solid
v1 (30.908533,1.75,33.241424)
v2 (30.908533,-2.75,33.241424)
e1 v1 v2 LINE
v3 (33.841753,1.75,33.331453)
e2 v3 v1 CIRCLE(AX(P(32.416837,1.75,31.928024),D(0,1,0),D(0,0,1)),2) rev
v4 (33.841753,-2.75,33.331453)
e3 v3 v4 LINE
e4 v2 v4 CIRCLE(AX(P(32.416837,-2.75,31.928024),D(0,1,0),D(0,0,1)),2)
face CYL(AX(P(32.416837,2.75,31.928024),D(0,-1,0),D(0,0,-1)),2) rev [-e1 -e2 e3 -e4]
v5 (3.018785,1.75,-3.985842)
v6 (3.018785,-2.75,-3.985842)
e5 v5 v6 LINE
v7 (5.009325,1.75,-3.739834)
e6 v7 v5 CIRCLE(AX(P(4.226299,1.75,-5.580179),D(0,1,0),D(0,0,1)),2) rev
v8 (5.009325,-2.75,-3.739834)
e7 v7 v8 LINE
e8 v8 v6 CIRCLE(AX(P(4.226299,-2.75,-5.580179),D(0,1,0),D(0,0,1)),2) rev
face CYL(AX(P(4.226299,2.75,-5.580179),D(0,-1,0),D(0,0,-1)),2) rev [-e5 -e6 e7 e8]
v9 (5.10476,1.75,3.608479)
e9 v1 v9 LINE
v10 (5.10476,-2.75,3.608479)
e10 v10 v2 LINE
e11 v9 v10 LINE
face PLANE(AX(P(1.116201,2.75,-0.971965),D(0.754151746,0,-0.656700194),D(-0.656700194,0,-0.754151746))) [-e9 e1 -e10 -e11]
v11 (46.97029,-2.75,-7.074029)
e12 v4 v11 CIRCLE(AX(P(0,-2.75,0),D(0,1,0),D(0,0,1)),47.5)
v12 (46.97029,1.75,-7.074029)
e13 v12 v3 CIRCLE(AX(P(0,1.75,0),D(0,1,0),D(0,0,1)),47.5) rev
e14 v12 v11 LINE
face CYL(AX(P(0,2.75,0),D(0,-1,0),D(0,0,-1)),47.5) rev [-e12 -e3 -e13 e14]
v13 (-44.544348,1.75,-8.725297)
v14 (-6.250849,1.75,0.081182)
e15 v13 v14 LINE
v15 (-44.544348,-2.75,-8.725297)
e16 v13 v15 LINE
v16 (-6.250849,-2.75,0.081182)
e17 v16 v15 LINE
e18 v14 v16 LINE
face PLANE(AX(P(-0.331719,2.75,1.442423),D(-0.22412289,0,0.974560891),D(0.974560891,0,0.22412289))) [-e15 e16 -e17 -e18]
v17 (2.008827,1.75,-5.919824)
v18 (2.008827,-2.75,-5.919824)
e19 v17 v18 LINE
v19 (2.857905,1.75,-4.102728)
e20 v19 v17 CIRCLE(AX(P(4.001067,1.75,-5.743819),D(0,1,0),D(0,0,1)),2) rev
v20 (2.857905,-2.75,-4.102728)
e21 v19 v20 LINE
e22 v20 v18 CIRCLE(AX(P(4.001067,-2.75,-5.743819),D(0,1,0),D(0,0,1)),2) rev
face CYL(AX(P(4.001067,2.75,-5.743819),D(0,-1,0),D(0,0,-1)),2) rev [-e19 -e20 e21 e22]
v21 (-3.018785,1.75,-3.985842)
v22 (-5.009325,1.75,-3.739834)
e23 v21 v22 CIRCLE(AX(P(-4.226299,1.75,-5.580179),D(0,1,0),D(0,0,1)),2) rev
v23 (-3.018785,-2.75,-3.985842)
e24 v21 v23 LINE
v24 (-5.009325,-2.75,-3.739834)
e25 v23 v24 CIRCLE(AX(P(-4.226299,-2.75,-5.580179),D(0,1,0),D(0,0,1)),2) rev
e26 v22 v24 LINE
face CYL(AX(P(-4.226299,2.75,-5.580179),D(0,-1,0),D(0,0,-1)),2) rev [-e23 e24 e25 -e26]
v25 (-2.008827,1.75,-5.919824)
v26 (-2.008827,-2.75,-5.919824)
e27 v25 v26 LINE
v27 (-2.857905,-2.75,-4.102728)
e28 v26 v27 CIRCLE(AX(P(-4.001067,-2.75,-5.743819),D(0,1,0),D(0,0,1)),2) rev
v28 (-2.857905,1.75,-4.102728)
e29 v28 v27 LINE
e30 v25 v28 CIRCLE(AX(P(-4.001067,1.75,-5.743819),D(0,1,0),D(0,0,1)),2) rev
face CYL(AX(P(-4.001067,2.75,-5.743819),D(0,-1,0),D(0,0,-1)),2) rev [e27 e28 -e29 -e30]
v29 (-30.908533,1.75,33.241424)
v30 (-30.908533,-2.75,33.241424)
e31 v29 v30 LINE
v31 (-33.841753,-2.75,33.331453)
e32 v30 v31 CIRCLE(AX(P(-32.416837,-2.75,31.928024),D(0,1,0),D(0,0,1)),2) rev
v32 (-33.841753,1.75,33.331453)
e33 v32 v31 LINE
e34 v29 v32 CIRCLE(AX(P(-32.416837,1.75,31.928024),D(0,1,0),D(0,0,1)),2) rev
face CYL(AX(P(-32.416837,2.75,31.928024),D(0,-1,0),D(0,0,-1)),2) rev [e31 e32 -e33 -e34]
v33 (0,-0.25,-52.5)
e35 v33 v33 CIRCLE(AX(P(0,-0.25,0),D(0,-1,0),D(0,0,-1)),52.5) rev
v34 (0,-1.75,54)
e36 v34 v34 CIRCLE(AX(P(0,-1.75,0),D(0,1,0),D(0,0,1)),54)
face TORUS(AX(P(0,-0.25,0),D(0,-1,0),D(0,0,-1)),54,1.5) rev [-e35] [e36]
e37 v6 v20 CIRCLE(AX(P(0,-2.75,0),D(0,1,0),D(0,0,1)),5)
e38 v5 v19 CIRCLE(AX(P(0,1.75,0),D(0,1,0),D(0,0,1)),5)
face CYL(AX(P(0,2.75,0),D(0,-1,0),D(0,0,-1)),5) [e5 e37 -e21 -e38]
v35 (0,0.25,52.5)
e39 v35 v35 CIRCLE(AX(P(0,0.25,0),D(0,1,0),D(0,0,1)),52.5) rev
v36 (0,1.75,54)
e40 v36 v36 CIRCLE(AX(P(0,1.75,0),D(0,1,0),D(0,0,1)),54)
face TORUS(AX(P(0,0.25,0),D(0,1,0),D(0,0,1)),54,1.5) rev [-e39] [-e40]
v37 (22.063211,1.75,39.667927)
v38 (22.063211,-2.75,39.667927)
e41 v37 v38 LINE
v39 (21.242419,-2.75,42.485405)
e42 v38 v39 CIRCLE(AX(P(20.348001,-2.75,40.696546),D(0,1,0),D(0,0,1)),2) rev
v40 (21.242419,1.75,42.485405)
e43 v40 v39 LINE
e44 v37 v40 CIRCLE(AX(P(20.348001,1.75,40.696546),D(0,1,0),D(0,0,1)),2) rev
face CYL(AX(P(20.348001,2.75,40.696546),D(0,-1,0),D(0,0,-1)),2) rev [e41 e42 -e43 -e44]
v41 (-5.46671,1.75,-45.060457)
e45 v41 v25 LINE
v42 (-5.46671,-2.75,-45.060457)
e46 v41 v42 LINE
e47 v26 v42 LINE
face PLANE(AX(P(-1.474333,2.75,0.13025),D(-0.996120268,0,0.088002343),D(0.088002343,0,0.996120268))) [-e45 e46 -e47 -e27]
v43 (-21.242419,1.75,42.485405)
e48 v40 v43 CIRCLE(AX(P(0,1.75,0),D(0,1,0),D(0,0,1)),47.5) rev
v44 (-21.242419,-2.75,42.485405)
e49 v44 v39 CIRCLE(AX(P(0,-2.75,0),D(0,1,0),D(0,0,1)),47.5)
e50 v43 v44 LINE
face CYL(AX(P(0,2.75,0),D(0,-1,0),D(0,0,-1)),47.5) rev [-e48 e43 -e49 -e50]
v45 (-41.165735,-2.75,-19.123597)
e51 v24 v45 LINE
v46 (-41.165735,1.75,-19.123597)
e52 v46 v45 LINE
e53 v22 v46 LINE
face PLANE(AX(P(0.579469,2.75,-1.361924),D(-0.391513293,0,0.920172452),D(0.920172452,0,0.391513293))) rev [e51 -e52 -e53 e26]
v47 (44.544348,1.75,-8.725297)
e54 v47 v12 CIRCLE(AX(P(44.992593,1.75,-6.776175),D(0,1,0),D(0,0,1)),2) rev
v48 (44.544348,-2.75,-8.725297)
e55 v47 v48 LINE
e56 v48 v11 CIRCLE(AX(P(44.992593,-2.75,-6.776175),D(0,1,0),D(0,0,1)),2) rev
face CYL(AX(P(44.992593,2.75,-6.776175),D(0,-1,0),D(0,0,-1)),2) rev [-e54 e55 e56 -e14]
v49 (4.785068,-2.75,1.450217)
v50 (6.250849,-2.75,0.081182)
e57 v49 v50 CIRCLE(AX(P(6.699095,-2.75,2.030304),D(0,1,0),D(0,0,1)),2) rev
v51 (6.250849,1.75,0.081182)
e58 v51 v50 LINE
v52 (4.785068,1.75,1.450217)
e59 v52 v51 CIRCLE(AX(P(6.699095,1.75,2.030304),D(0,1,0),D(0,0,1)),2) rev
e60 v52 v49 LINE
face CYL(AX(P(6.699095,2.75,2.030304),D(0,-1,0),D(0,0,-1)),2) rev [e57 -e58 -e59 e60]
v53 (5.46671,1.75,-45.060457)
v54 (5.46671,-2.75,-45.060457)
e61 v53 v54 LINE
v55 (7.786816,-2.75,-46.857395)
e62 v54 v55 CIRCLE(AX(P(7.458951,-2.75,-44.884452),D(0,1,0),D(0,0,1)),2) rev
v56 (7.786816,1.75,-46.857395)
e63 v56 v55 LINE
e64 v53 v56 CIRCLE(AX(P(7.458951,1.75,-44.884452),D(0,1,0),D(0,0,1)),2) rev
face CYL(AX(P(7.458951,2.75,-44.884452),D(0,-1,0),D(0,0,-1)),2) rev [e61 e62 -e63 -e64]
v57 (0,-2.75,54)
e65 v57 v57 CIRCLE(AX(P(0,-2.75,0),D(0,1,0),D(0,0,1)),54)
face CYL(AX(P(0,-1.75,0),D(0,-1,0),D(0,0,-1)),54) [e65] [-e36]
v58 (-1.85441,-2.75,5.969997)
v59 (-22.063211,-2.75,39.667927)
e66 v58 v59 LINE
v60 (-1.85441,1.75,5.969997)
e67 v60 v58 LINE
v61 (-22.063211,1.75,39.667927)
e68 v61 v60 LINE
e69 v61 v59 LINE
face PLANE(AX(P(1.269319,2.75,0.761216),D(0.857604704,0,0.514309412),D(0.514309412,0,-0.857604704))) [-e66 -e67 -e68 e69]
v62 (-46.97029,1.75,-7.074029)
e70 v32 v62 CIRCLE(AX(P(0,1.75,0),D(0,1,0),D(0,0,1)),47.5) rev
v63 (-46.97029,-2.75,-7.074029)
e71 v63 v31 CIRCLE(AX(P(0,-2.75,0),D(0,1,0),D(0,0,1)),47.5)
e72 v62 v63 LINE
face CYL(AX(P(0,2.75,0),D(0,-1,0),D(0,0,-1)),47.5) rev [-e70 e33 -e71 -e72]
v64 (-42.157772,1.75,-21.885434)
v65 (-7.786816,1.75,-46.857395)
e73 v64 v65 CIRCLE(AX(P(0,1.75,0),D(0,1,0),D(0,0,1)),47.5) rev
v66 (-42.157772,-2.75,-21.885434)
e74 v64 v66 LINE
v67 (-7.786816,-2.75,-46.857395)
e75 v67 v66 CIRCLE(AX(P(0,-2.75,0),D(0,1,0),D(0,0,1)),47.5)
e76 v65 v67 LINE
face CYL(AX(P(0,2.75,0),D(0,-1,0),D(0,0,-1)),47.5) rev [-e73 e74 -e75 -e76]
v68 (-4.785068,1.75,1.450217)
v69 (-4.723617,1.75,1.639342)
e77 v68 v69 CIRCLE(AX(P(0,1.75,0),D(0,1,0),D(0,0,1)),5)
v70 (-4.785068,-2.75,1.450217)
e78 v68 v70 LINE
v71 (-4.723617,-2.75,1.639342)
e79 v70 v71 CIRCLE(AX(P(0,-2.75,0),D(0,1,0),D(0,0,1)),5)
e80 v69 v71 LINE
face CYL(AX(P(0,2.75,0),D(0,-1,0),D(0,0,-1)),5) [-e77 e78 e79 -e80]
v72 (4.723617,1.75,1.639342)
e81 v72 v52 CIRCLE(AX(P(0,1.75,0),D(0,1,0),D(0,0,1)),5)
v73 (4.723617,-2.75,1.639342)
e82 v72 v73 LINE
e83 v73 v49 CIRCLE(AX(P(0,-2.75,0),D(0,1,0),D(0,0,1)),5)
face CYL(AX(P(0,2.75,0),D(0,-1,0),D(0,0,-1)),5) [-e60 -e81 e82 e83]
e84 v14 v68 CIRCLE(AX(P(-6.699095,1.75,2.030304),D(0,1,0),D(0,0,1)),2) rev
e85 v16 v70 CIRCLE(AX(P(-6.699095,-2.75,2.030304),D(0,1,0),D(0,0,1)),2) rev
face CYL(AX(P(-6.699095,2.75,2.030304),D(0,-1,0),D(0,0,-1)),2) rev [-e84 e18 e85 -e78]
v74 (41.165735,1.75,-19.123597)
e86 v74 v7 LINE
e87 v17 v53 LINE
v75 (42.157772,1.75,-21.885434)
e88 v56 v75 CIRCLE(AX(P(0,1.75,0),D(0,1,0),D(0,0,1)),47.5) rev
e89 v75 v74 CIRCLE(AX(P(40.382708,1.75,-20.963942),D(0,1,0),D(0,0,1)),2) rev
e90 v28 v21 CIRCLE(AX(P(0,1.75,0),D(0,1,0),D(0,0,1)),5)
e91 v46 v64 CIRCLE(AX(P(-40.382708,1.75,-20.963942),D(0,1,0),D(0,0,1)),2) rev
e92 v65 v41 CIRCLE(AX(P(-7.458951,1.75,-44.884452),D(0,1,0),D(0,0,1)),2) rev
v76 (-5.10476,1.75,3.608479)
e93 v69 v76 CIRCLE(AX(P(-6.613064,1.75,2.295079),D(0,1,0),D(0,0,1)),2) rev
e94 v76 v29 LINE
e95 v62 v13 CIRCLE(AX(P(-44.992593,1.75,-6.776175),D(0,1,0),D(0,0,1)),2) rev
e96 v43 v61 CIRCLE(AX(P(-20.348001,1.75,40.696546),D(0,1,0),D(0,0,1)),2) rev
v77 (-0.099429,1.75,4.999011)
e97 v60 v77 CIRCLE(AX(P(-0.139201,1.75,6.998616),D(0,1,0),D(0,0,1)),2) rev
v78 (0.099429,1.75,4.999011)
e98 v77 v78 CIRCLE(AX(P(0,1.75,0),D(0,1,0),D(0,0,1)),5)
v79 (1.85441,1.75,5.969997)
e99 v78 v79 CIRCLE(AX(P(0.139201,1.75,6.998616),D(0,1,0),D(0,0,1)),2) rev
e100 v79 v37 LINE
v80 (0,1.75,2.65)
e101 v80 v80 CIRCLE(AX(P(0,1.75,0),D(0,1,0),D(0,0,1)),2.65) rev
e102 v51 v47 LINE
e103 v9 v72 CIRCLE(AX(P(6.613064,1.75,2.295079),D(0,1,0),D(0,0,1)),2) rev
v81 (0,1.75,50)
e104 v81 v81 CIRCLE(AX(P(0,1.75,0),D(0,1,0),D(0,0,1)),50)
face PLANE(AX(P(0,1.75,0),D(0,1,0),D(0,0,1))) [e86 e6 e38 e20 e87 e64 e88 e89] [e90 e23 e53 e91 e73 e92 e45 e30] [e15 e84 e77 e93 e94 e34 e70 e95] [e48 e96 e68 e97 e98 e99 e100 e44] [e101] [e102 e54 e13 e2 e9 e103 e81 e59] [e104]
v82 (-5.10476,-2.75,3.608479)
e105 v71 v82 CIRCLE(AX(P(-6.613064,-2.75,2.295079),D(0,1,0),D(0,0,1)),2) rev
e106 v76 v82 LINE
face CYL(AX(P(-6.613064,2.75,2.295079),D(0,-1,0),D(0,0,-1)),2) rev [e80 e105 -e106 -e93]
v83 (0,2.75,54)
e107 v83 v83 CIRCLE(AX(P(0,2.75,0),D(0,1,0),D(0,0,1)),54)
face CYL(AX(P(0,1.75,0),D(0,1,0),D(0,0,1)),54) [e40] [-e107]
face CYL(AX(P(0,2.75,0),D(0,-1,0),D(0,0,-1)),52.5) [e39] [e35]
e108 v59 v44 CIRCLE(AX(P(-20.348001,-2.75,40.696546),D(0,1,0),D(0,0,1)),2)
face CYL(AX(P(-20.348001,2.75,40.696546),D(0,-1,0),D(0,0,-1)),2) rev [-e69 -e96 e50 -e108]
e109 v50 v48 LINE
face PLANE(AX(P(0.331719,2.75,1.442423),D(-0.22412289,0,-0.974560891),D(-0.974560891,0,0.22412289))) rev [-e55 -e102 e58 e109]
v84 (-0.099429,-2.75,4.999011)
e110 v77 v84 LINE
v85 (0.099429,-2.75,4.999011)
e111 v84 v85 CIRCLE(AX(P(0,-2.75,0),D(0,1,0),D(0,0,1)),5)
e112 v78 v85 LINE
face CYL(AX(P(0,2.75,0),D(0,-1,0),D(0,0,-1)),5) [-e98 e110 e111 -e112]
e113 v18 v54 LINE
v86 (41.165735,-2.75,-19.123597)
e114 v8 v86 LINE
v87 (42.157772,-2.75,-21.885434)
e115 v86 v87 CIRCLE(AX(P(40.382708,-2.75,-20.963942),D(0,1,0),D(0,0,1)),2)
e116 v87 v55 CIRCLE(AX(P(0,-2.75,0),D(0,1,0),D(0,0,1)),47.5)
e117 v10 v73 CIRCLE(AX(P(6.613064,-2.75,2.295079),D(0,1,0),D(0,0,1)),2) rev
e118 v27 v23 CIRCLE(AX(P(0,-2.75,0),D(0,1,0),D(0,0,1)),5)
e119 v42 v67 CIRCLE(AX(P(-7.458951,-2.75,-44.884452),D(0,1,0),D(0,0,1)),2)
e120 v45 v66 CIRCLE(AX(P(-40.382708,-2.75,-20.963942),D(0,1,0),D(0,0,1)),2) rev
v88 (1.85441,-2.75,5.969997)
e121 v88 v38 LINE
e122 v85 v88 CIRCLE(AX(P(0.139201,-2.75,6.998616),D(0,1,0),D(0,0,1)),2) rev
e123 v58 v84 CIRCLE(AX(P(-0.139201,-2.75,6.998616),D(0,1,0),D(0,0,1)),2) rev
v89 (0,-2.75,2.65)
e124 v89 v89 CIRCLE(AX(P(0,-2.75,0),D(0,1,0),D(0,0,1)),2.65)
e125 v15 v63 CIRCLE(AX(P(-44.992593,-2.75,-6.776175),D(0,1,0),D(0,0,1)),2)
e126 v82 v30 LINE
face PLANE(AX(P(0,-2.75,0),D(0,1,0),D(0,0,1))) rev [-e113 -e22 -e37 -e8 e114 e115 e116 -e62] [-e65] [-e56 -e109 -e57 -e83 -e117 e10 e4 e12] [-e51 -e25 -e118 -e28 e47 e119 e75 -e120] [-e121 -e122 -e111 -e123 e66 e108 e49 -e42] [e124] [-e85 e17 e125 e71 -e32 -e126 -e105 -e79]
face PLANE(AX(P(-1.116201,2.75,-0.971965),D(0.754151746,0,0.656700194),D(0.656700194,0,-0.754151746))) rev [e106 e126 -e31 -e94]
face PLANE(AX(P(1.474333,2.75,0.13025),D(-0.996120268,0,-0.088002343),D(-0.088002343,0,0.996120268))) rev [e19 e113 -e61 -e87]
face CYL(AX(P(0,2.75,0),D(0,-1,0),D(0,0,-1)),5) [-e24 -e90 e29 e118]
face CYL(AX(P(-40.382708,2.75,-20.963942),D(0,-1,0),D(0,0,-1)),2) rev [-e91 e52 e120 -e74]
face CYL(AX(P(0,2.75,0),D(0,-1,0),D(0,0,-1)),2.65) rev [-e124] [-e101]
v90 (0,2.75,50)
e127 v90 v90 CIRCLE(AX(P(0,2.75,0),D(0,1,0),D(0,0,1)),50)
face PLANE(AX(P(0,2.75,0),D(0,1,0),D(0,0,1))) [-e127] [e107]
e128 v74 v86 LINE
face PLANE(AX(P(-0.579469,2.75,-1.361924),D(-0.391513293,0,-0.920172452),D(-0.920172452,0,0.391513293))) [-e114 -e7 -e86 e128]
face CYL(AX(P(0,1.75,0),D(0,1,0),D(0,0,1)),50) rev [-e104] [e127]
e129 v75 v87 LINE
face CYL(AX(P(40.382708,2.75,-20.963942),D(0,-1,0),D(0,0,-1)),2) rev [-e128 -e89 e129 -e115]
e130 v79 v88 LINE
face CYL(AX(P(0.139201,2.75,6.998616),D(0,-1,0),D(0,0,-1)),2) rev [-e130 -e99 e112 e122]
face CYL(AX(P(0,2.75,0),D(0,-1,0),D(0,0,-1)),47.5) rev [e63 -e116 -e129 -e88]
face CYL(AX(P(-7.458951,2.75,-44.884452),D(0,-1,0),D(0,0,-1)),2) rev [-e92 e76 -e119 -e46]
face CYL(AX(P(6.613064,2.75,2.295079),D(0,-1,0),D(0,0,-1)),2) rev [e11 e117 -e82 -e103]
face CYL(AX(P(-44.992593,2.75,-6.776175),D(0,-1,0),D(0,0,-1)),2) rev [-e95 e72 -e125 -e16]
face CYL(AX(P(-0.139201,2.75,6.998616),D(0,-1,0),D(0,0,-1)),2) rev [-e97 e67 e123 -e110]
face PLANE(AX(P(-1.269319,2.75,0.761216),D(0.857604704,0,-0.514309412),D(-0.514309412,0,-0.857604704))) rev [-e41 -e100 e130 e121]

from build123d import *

# Parameters (mm, degrees)
SKETCH_2_R          = 52.5
SKETCH_2_R_2        = 2.65
EXTRUDE_1_DEPTH     = 2.75
SKETCH_3_R          = 54
SKETCH_3_R_2        = 52.5
EXTRUDE_2_DEPTH     = 1
SKETCH_4_R          = 50
SKETCH_4_R_2        = 2.65
CUT_EXTRUDE_1_DEPTH = 1
FILLET_1_R          = 1.5


with BuildPart() as part:
    # 草图2 → 凸台-拉伸1 (new, symmetric)
    with BuildSketch(Plane(origin=(0, 0, 0), x_dir=(1, 0, 0), z_dir=(0, 1, 0))):
        with Locations(Location((0, 0, 0), (0, 0, 270))):
            Circle(SKETCH_2_R)
        with Locations(Location((0, 0, 0), (0, 0, 270))):
            Circle(SKETCH_2_R_2, mode=Mode.SUBTRACT)
        with BuildLine():
            Line((-5.104760308, -3.608479293), (-30.908533356, -33.241423952))
            ThreePointArc((-30.908533356, -33.241423952), (-32.355479798, -33.927082172), (-33.841752753, -33.331453173))
            ThreePointArc((-33.841752753, -33.331453173), (-45.175184524, -14.678307233), (-46.970289709, 7.074028884))
            ThreePointArc((-46.970289709, 7.074028884), (-46.117971572, 8.42951219), (-44.544347521, 8.725296818))
            Line((-44.544347521, 8.725296818), (-6.250848753, -0.081181754))
            ThreePointArc((-6.250848753, -0.081181754), (-5.333939805, -0.568676849), (-4.785067523, -1.450216811))
            ThreePointArc((-4.785067523, -1.450216811), (-4.755282581, -1.545084972), (-4.723617, -1.639342075))
            ThreePointArc((-4.723617, -1.639342075), (-4.649507815, -2.675141919), (-5.104760308, -3.608479293))
        make_face(mode=Mode.SUBTRACT)
        with BuildLine():
            Line((-5.009325433, 3.73983413), (-41.165734939, 19.123597139))
            ThreePointArc((-41.165734939, 19.123597139), (-42.264965697, 20.287844939), (-42.157772458, 21.885434001))
            ThreePointArc((-42.157772458, 21.885434001), (-27.919799484, 38.428307233), (-7.786816484, 46.857395244))
            ThreePointArc((-7.786816484, 46.857395244), (-6.234294464, 46.465659903), (-5.466709992, 45.060456971))
            Line((-5.466709992, 45.060456971), (-2.00882693, 5.919823897))
            ThreePointArc((-2.00882693, 5.919823897), (-2.18912187, 4.897147398), (-2.857905332, 4.102728009))
            ThreePointArc((-2.857905332, 4.102728009), (-2.938926261, 4.045084972), (-3.018784891, 3.985842167))
            ThreePointArc((-3.018784891, 3.985842167), (-3.980988084, 3.595280389), (-5.009325433, 3.73983413))
        make_face(mode=Mode.SUBTRACT)
        with BuildLine():
            Line((1.854410058, -5.96999698), (22.063210783, -39.667926976))
            ThreePointArc((22.063210783, -39.667926976), (22.26817946, -41.255934861), (21.242419017, -42.485404956))
            ThreePointArc((21.242419017, -42.485404956), (0, -47.5), (-21.242419017, -42.485404956))
            ThreePointArc((-21.242419017, -42.485404956), (-22.26817946, -41.255934861), (-22.063210783, -39.667926976))
            Line((-22.063210783, -39.667926976), (-1.854410058, -5.96999698))
            ThreePointArc((-1.854410058, -5.96999698), (-1.107434224, -5.24860902), (-0.099429036, -4.999011289))
            ThreePointArc((-0.099429036, -4.999011289), (0, -5), (0.099429036, -4.999011289))
            ThreePointArc((0.099429036, -4.999011289), (1.107434224, -5.24860902), (1.854410058, -5.96999698))
        make_face(mode=Mode.SUBTRACT)
        with BuildLine():
            Line((6.250848753, -0.081181754), (44.544347521, 8.725296818))
            ThreePointArc((44.544347521, 8.725296818), (46.117971572, 8.42951219), (46.970289709, 7.074028884))
            ThreePointArc((46.970289709, 7.074028884), (45.175184524, -14.678307233), (33.841752753, -33.331453173))
            ThreePointArc((33.841752753, -33.331453173), (32.355479798, -33.927082172), (30.908533356, -33.241423952))
            Line((30.908533356, -33.241423952), (5.104760308, -3.608479293))
            ThreePointArc((5.104760308, -3.608479293), (4.649507815, -2.675141919), (4.723617, -1.639342075))
            ThreePointArc((4.723617, -1.639342075), (4.755282581, -1.545084972), (4.785067523, -1.450216811))
            ThreePointArc((4.785067523, -1.450216811), (5.333939805, -0.568676849), (6.250848753, -0.081181754))
        make_face(mode=Mode.SUBTRACT)
        with BuildLine():
            Line((2.00882693, 5.919823897), (5.466709992, 45.060456971))
            ThreePointArc((5.466709992, 45.060456971), (6.234294464, 46.465659903), (7.786816484, 46.857395244))
            ThreePointArc((7.786816484, 46.857395244), (27.919799484, 38.428307233), (42.157772458, 21.885434001))
            ThreePointArc((42.157772458, 21.885434001), (42.264965697, 20.287844939), (41.165734939, 19.123597139))
            Line((41.165734939, 19.123597139), (5.009325433, 3.73983413))
            ThreePointArc((5.009325433, 3.73983413), (3.980988084, 3.595280389), (3.018784891, 3.985842167))
            ThreePointArc((3.018784891, 3.985842167), (2.938926261, 4.045084972), (2.857905332, 4.102728009))
            ThreePointArc((2.857905332, 4.102728009), (2.18912187, 4.897147398), (2.00882693, 5.919823897))
        make_face(mode=Mode.SUBTRACT)
    extrude(amount=EXTRUDE_1_DEPTH, both=True)

    # 草图3 → 凸台-拉伸2 (add)
    with BuildSketch(Plane(origin=(0, 2.75, 0), x_dir=(1, 0, 0), z_dir=(0, 1, 0))):
        with Locations(Location((0, 0, 0), (0, 0, 270))):
            Circle(SKETCH_3_R)
        with Locations(Location((0, 0, 0), (0, 0, 270))):
            Circle(SKETCH_3_R_2, mode=Mode.SUBTRACT)
    extrude_2 = extrude(amount=-EXTRUDE_2_DEPTH)

    # 草图4 → 切除-拉伸1 (cut)
    with BuildSketch(Plane(origin=(0, 2.75, 0), x_dir=(1, 0, 0), z_dir=(0, 1, 0))):
        with Locations(Location((0, 0, 0), (0, 0, 270))):
            Circle(SKETCH_4_R)
        with Locations(Location((0, 0, 0), (0, 0, 270))):
            Circle(SKETCH_4_R_2, mode=Mode.SUBTRACT)
        with BuildLine():
            Line((41.165734939, 19.123597139), (5.009325433, 3.73983413))
            ThreePointArc((5.009325433, 3.73983413), (3.980988084, 3.595280389), (3.018784891, 3.985842167))
            ThreePointArc((3.018784891, 3.985842167), (2.938926261, 4.045084972), (2.857905332, 4.102728009))
            ThreePointArc((2.857905332, 4.102728009), (2.18912187, 4.897147398), (2.00882693, 5.919823897))
            Line((2.00882693, 5.919823897), (5.466709992, 45.060456971))
            ThreePointArc((5.466709992, 45.060456971), (6.234294464, 46.465659903), (7.786816484, 46.857395244))
            ThreePointArc((7.786816484, 46.857395244), (27.919799484, 38.428307233), (42.157772458, 21.885434001))
            ThreePointArc((42.157772458, 21.885434001), (42.264965697, 20.287844939), (41.165734939, 19.123597139))
        make_face(mode=Mode.SUBTRACT)
        with BuildLine():
            Line((30.908533356, -33.241423952), (5.104760308, -3.608479293))
            ThreePointArc((5.104760308, -3.608479293), (4.649507815, -2.675141919), (4.723617, -1.639342075))
            ThreePointArc((4.723617, -1.639342075), (4.755282581, -1.545084972), (4.785067523, -1.450216811))
            ThreePointArc((4.785067523, -1.450216811), (5.333939805, -0.568676849), (6.250848753, -0.081181754))
            Line((6.250848753, -0.081181754), (44.544347521, 8.725296818))
            ThreePointArc((44.544347521, 8.725296818), (46.117971572, 8.42951219), (46.970289709, 7.074028884))
            ThreePointArc((46.970289709, 7.074028884), (45.175184524, -14.678307233), (33.841752753, -33.331453173))
            ThreePointArc((33.841752753, -33.331453173), (32.355479798, -33.927082172), (30.908533356, -33.241423952))
        make_face(mode=Mode.SUBTRACT)
        with BuildLine():
            Line((-22.063210783, -39.667926976), (-1.854410058, -5.96999698))
            ThreePointArc((-1.854410058, -5.96999698), (-1.107434224, -5.24860902), (-0.099429036, -4.999011289))
            ThreePointArc((-0.099429036, -4.999011289), (0, -5), (0.099429036, -4.999011289))
            ThreePointArc((0.099429036, -4.999011289), (1.107434224, -5.24860902), (1.854410058, -5.96999698))
            Line((1.854410058, -5.96999698), (22.063210783, -39.667926976))
            ThreePointArc((22.063210783, -39.667926976), (22.26817946, -41.255934861), (21.242419017, -42.485404956))
            ThreePointArc((21.242419017, -42.485404956), (0, -47.5), (-21.242419017, -42.485404956))
            ThreePointArc((-21.242419017, -42.485404956), (-22.26817946, -41.255934861), (-22.063210783, -39.667926976))
        make_face(mode=Mode.SUBTRACT)
        with BuildLine():
            Line((-44.544347521, 8.725296818), (-6.250848753, -0.081181754))
            ThreePointArc((-6.250848753, -0.081181754), (-5.333939805, -0.568676849), (-4.785067523, -1.450216811))
            ThreePointArc((-4.785067523, -1.450216811), (-4.755282581, -1.545084972), (-4.723617, -1.639342075))
            ThreePointArc((-4.723617, -1.639342075), (-4.649507815, -2.675141919), (-5.104760308, -3.608479293))
            Line((-5.104760308, -3.608479293), (-30.908533356, -33.241423952))
            ThreePointArc((-30.908533356, -33.241423952), (-32.355479798, -33.927082172), (-33.841752753, -33.331453173))
            ThreePointArc((-33.841752753, -33.331453173), (-45.175184524, -14.678307233), (-46.970289709, 7.074028884))
            ThreePointArc((-46.970289709, 7.074028884), (-46.117971572, 8.42951219), (-44.544347521, 8.725296818))
        make_face(mode=Mode.SUBTRACT)
        with BuildLine():
            ThreePointArc((-7.786816484, 46.857395244), (-6.234294464, 46.465659903), (-5.466709992, 45.060456971))
            Line((-5.466709992, 45.060456971), (-2.00882693, 5.919823897))
            ThreePointArc((-2.00882693, 5.919823897), (-2.18912187, 4.897147398), (-2.857905332, 4.102728009))
            ThreePointArc((-2.857905332, 4.102728009), (-2.938926261, 4.045084972), (-3.018784891, 3.985842167))
            ThreePointArc((-3.018784891, 3.985842167), (-3.980988084, 3.595280389), (-5.009325433, 3.73983413))
            Line((-5.009325433, 3.73983413), (-41.165734939, 19.123597139))
            ThreePointArc((-41.165734939, 19.123597139), (-42.264965697, 20.287844939), (-42.157772458, 21.885434001))
            ThreePointArc((-42.157772458, 21.885434001), (-27.919799484, 38.428307233), (-7.786816484, 46.857395244))
        make_face(mode=Mode.SUBTRACT)
    extrude(amount=-CUT_EXTRUDE_1_DEPTH, mode=Mode.SUBTRACT)

    # 镜向1: 凸台-拉伸2 across plane
    add(extrude_2.mirror(Plane.ZX))

    # 圆角1
    fillet_1_edges = [part.edges().sort_by_distance(p)[0] for p in [
        (0, 1.75, -52.5),
        (0, -1.75, -52.5),
    ]]
    fillet(fillet_1_edges, radius=FILLET_1_R - 0.0001)  # a hair under: the kernel refuses the full size


solid = part.part
